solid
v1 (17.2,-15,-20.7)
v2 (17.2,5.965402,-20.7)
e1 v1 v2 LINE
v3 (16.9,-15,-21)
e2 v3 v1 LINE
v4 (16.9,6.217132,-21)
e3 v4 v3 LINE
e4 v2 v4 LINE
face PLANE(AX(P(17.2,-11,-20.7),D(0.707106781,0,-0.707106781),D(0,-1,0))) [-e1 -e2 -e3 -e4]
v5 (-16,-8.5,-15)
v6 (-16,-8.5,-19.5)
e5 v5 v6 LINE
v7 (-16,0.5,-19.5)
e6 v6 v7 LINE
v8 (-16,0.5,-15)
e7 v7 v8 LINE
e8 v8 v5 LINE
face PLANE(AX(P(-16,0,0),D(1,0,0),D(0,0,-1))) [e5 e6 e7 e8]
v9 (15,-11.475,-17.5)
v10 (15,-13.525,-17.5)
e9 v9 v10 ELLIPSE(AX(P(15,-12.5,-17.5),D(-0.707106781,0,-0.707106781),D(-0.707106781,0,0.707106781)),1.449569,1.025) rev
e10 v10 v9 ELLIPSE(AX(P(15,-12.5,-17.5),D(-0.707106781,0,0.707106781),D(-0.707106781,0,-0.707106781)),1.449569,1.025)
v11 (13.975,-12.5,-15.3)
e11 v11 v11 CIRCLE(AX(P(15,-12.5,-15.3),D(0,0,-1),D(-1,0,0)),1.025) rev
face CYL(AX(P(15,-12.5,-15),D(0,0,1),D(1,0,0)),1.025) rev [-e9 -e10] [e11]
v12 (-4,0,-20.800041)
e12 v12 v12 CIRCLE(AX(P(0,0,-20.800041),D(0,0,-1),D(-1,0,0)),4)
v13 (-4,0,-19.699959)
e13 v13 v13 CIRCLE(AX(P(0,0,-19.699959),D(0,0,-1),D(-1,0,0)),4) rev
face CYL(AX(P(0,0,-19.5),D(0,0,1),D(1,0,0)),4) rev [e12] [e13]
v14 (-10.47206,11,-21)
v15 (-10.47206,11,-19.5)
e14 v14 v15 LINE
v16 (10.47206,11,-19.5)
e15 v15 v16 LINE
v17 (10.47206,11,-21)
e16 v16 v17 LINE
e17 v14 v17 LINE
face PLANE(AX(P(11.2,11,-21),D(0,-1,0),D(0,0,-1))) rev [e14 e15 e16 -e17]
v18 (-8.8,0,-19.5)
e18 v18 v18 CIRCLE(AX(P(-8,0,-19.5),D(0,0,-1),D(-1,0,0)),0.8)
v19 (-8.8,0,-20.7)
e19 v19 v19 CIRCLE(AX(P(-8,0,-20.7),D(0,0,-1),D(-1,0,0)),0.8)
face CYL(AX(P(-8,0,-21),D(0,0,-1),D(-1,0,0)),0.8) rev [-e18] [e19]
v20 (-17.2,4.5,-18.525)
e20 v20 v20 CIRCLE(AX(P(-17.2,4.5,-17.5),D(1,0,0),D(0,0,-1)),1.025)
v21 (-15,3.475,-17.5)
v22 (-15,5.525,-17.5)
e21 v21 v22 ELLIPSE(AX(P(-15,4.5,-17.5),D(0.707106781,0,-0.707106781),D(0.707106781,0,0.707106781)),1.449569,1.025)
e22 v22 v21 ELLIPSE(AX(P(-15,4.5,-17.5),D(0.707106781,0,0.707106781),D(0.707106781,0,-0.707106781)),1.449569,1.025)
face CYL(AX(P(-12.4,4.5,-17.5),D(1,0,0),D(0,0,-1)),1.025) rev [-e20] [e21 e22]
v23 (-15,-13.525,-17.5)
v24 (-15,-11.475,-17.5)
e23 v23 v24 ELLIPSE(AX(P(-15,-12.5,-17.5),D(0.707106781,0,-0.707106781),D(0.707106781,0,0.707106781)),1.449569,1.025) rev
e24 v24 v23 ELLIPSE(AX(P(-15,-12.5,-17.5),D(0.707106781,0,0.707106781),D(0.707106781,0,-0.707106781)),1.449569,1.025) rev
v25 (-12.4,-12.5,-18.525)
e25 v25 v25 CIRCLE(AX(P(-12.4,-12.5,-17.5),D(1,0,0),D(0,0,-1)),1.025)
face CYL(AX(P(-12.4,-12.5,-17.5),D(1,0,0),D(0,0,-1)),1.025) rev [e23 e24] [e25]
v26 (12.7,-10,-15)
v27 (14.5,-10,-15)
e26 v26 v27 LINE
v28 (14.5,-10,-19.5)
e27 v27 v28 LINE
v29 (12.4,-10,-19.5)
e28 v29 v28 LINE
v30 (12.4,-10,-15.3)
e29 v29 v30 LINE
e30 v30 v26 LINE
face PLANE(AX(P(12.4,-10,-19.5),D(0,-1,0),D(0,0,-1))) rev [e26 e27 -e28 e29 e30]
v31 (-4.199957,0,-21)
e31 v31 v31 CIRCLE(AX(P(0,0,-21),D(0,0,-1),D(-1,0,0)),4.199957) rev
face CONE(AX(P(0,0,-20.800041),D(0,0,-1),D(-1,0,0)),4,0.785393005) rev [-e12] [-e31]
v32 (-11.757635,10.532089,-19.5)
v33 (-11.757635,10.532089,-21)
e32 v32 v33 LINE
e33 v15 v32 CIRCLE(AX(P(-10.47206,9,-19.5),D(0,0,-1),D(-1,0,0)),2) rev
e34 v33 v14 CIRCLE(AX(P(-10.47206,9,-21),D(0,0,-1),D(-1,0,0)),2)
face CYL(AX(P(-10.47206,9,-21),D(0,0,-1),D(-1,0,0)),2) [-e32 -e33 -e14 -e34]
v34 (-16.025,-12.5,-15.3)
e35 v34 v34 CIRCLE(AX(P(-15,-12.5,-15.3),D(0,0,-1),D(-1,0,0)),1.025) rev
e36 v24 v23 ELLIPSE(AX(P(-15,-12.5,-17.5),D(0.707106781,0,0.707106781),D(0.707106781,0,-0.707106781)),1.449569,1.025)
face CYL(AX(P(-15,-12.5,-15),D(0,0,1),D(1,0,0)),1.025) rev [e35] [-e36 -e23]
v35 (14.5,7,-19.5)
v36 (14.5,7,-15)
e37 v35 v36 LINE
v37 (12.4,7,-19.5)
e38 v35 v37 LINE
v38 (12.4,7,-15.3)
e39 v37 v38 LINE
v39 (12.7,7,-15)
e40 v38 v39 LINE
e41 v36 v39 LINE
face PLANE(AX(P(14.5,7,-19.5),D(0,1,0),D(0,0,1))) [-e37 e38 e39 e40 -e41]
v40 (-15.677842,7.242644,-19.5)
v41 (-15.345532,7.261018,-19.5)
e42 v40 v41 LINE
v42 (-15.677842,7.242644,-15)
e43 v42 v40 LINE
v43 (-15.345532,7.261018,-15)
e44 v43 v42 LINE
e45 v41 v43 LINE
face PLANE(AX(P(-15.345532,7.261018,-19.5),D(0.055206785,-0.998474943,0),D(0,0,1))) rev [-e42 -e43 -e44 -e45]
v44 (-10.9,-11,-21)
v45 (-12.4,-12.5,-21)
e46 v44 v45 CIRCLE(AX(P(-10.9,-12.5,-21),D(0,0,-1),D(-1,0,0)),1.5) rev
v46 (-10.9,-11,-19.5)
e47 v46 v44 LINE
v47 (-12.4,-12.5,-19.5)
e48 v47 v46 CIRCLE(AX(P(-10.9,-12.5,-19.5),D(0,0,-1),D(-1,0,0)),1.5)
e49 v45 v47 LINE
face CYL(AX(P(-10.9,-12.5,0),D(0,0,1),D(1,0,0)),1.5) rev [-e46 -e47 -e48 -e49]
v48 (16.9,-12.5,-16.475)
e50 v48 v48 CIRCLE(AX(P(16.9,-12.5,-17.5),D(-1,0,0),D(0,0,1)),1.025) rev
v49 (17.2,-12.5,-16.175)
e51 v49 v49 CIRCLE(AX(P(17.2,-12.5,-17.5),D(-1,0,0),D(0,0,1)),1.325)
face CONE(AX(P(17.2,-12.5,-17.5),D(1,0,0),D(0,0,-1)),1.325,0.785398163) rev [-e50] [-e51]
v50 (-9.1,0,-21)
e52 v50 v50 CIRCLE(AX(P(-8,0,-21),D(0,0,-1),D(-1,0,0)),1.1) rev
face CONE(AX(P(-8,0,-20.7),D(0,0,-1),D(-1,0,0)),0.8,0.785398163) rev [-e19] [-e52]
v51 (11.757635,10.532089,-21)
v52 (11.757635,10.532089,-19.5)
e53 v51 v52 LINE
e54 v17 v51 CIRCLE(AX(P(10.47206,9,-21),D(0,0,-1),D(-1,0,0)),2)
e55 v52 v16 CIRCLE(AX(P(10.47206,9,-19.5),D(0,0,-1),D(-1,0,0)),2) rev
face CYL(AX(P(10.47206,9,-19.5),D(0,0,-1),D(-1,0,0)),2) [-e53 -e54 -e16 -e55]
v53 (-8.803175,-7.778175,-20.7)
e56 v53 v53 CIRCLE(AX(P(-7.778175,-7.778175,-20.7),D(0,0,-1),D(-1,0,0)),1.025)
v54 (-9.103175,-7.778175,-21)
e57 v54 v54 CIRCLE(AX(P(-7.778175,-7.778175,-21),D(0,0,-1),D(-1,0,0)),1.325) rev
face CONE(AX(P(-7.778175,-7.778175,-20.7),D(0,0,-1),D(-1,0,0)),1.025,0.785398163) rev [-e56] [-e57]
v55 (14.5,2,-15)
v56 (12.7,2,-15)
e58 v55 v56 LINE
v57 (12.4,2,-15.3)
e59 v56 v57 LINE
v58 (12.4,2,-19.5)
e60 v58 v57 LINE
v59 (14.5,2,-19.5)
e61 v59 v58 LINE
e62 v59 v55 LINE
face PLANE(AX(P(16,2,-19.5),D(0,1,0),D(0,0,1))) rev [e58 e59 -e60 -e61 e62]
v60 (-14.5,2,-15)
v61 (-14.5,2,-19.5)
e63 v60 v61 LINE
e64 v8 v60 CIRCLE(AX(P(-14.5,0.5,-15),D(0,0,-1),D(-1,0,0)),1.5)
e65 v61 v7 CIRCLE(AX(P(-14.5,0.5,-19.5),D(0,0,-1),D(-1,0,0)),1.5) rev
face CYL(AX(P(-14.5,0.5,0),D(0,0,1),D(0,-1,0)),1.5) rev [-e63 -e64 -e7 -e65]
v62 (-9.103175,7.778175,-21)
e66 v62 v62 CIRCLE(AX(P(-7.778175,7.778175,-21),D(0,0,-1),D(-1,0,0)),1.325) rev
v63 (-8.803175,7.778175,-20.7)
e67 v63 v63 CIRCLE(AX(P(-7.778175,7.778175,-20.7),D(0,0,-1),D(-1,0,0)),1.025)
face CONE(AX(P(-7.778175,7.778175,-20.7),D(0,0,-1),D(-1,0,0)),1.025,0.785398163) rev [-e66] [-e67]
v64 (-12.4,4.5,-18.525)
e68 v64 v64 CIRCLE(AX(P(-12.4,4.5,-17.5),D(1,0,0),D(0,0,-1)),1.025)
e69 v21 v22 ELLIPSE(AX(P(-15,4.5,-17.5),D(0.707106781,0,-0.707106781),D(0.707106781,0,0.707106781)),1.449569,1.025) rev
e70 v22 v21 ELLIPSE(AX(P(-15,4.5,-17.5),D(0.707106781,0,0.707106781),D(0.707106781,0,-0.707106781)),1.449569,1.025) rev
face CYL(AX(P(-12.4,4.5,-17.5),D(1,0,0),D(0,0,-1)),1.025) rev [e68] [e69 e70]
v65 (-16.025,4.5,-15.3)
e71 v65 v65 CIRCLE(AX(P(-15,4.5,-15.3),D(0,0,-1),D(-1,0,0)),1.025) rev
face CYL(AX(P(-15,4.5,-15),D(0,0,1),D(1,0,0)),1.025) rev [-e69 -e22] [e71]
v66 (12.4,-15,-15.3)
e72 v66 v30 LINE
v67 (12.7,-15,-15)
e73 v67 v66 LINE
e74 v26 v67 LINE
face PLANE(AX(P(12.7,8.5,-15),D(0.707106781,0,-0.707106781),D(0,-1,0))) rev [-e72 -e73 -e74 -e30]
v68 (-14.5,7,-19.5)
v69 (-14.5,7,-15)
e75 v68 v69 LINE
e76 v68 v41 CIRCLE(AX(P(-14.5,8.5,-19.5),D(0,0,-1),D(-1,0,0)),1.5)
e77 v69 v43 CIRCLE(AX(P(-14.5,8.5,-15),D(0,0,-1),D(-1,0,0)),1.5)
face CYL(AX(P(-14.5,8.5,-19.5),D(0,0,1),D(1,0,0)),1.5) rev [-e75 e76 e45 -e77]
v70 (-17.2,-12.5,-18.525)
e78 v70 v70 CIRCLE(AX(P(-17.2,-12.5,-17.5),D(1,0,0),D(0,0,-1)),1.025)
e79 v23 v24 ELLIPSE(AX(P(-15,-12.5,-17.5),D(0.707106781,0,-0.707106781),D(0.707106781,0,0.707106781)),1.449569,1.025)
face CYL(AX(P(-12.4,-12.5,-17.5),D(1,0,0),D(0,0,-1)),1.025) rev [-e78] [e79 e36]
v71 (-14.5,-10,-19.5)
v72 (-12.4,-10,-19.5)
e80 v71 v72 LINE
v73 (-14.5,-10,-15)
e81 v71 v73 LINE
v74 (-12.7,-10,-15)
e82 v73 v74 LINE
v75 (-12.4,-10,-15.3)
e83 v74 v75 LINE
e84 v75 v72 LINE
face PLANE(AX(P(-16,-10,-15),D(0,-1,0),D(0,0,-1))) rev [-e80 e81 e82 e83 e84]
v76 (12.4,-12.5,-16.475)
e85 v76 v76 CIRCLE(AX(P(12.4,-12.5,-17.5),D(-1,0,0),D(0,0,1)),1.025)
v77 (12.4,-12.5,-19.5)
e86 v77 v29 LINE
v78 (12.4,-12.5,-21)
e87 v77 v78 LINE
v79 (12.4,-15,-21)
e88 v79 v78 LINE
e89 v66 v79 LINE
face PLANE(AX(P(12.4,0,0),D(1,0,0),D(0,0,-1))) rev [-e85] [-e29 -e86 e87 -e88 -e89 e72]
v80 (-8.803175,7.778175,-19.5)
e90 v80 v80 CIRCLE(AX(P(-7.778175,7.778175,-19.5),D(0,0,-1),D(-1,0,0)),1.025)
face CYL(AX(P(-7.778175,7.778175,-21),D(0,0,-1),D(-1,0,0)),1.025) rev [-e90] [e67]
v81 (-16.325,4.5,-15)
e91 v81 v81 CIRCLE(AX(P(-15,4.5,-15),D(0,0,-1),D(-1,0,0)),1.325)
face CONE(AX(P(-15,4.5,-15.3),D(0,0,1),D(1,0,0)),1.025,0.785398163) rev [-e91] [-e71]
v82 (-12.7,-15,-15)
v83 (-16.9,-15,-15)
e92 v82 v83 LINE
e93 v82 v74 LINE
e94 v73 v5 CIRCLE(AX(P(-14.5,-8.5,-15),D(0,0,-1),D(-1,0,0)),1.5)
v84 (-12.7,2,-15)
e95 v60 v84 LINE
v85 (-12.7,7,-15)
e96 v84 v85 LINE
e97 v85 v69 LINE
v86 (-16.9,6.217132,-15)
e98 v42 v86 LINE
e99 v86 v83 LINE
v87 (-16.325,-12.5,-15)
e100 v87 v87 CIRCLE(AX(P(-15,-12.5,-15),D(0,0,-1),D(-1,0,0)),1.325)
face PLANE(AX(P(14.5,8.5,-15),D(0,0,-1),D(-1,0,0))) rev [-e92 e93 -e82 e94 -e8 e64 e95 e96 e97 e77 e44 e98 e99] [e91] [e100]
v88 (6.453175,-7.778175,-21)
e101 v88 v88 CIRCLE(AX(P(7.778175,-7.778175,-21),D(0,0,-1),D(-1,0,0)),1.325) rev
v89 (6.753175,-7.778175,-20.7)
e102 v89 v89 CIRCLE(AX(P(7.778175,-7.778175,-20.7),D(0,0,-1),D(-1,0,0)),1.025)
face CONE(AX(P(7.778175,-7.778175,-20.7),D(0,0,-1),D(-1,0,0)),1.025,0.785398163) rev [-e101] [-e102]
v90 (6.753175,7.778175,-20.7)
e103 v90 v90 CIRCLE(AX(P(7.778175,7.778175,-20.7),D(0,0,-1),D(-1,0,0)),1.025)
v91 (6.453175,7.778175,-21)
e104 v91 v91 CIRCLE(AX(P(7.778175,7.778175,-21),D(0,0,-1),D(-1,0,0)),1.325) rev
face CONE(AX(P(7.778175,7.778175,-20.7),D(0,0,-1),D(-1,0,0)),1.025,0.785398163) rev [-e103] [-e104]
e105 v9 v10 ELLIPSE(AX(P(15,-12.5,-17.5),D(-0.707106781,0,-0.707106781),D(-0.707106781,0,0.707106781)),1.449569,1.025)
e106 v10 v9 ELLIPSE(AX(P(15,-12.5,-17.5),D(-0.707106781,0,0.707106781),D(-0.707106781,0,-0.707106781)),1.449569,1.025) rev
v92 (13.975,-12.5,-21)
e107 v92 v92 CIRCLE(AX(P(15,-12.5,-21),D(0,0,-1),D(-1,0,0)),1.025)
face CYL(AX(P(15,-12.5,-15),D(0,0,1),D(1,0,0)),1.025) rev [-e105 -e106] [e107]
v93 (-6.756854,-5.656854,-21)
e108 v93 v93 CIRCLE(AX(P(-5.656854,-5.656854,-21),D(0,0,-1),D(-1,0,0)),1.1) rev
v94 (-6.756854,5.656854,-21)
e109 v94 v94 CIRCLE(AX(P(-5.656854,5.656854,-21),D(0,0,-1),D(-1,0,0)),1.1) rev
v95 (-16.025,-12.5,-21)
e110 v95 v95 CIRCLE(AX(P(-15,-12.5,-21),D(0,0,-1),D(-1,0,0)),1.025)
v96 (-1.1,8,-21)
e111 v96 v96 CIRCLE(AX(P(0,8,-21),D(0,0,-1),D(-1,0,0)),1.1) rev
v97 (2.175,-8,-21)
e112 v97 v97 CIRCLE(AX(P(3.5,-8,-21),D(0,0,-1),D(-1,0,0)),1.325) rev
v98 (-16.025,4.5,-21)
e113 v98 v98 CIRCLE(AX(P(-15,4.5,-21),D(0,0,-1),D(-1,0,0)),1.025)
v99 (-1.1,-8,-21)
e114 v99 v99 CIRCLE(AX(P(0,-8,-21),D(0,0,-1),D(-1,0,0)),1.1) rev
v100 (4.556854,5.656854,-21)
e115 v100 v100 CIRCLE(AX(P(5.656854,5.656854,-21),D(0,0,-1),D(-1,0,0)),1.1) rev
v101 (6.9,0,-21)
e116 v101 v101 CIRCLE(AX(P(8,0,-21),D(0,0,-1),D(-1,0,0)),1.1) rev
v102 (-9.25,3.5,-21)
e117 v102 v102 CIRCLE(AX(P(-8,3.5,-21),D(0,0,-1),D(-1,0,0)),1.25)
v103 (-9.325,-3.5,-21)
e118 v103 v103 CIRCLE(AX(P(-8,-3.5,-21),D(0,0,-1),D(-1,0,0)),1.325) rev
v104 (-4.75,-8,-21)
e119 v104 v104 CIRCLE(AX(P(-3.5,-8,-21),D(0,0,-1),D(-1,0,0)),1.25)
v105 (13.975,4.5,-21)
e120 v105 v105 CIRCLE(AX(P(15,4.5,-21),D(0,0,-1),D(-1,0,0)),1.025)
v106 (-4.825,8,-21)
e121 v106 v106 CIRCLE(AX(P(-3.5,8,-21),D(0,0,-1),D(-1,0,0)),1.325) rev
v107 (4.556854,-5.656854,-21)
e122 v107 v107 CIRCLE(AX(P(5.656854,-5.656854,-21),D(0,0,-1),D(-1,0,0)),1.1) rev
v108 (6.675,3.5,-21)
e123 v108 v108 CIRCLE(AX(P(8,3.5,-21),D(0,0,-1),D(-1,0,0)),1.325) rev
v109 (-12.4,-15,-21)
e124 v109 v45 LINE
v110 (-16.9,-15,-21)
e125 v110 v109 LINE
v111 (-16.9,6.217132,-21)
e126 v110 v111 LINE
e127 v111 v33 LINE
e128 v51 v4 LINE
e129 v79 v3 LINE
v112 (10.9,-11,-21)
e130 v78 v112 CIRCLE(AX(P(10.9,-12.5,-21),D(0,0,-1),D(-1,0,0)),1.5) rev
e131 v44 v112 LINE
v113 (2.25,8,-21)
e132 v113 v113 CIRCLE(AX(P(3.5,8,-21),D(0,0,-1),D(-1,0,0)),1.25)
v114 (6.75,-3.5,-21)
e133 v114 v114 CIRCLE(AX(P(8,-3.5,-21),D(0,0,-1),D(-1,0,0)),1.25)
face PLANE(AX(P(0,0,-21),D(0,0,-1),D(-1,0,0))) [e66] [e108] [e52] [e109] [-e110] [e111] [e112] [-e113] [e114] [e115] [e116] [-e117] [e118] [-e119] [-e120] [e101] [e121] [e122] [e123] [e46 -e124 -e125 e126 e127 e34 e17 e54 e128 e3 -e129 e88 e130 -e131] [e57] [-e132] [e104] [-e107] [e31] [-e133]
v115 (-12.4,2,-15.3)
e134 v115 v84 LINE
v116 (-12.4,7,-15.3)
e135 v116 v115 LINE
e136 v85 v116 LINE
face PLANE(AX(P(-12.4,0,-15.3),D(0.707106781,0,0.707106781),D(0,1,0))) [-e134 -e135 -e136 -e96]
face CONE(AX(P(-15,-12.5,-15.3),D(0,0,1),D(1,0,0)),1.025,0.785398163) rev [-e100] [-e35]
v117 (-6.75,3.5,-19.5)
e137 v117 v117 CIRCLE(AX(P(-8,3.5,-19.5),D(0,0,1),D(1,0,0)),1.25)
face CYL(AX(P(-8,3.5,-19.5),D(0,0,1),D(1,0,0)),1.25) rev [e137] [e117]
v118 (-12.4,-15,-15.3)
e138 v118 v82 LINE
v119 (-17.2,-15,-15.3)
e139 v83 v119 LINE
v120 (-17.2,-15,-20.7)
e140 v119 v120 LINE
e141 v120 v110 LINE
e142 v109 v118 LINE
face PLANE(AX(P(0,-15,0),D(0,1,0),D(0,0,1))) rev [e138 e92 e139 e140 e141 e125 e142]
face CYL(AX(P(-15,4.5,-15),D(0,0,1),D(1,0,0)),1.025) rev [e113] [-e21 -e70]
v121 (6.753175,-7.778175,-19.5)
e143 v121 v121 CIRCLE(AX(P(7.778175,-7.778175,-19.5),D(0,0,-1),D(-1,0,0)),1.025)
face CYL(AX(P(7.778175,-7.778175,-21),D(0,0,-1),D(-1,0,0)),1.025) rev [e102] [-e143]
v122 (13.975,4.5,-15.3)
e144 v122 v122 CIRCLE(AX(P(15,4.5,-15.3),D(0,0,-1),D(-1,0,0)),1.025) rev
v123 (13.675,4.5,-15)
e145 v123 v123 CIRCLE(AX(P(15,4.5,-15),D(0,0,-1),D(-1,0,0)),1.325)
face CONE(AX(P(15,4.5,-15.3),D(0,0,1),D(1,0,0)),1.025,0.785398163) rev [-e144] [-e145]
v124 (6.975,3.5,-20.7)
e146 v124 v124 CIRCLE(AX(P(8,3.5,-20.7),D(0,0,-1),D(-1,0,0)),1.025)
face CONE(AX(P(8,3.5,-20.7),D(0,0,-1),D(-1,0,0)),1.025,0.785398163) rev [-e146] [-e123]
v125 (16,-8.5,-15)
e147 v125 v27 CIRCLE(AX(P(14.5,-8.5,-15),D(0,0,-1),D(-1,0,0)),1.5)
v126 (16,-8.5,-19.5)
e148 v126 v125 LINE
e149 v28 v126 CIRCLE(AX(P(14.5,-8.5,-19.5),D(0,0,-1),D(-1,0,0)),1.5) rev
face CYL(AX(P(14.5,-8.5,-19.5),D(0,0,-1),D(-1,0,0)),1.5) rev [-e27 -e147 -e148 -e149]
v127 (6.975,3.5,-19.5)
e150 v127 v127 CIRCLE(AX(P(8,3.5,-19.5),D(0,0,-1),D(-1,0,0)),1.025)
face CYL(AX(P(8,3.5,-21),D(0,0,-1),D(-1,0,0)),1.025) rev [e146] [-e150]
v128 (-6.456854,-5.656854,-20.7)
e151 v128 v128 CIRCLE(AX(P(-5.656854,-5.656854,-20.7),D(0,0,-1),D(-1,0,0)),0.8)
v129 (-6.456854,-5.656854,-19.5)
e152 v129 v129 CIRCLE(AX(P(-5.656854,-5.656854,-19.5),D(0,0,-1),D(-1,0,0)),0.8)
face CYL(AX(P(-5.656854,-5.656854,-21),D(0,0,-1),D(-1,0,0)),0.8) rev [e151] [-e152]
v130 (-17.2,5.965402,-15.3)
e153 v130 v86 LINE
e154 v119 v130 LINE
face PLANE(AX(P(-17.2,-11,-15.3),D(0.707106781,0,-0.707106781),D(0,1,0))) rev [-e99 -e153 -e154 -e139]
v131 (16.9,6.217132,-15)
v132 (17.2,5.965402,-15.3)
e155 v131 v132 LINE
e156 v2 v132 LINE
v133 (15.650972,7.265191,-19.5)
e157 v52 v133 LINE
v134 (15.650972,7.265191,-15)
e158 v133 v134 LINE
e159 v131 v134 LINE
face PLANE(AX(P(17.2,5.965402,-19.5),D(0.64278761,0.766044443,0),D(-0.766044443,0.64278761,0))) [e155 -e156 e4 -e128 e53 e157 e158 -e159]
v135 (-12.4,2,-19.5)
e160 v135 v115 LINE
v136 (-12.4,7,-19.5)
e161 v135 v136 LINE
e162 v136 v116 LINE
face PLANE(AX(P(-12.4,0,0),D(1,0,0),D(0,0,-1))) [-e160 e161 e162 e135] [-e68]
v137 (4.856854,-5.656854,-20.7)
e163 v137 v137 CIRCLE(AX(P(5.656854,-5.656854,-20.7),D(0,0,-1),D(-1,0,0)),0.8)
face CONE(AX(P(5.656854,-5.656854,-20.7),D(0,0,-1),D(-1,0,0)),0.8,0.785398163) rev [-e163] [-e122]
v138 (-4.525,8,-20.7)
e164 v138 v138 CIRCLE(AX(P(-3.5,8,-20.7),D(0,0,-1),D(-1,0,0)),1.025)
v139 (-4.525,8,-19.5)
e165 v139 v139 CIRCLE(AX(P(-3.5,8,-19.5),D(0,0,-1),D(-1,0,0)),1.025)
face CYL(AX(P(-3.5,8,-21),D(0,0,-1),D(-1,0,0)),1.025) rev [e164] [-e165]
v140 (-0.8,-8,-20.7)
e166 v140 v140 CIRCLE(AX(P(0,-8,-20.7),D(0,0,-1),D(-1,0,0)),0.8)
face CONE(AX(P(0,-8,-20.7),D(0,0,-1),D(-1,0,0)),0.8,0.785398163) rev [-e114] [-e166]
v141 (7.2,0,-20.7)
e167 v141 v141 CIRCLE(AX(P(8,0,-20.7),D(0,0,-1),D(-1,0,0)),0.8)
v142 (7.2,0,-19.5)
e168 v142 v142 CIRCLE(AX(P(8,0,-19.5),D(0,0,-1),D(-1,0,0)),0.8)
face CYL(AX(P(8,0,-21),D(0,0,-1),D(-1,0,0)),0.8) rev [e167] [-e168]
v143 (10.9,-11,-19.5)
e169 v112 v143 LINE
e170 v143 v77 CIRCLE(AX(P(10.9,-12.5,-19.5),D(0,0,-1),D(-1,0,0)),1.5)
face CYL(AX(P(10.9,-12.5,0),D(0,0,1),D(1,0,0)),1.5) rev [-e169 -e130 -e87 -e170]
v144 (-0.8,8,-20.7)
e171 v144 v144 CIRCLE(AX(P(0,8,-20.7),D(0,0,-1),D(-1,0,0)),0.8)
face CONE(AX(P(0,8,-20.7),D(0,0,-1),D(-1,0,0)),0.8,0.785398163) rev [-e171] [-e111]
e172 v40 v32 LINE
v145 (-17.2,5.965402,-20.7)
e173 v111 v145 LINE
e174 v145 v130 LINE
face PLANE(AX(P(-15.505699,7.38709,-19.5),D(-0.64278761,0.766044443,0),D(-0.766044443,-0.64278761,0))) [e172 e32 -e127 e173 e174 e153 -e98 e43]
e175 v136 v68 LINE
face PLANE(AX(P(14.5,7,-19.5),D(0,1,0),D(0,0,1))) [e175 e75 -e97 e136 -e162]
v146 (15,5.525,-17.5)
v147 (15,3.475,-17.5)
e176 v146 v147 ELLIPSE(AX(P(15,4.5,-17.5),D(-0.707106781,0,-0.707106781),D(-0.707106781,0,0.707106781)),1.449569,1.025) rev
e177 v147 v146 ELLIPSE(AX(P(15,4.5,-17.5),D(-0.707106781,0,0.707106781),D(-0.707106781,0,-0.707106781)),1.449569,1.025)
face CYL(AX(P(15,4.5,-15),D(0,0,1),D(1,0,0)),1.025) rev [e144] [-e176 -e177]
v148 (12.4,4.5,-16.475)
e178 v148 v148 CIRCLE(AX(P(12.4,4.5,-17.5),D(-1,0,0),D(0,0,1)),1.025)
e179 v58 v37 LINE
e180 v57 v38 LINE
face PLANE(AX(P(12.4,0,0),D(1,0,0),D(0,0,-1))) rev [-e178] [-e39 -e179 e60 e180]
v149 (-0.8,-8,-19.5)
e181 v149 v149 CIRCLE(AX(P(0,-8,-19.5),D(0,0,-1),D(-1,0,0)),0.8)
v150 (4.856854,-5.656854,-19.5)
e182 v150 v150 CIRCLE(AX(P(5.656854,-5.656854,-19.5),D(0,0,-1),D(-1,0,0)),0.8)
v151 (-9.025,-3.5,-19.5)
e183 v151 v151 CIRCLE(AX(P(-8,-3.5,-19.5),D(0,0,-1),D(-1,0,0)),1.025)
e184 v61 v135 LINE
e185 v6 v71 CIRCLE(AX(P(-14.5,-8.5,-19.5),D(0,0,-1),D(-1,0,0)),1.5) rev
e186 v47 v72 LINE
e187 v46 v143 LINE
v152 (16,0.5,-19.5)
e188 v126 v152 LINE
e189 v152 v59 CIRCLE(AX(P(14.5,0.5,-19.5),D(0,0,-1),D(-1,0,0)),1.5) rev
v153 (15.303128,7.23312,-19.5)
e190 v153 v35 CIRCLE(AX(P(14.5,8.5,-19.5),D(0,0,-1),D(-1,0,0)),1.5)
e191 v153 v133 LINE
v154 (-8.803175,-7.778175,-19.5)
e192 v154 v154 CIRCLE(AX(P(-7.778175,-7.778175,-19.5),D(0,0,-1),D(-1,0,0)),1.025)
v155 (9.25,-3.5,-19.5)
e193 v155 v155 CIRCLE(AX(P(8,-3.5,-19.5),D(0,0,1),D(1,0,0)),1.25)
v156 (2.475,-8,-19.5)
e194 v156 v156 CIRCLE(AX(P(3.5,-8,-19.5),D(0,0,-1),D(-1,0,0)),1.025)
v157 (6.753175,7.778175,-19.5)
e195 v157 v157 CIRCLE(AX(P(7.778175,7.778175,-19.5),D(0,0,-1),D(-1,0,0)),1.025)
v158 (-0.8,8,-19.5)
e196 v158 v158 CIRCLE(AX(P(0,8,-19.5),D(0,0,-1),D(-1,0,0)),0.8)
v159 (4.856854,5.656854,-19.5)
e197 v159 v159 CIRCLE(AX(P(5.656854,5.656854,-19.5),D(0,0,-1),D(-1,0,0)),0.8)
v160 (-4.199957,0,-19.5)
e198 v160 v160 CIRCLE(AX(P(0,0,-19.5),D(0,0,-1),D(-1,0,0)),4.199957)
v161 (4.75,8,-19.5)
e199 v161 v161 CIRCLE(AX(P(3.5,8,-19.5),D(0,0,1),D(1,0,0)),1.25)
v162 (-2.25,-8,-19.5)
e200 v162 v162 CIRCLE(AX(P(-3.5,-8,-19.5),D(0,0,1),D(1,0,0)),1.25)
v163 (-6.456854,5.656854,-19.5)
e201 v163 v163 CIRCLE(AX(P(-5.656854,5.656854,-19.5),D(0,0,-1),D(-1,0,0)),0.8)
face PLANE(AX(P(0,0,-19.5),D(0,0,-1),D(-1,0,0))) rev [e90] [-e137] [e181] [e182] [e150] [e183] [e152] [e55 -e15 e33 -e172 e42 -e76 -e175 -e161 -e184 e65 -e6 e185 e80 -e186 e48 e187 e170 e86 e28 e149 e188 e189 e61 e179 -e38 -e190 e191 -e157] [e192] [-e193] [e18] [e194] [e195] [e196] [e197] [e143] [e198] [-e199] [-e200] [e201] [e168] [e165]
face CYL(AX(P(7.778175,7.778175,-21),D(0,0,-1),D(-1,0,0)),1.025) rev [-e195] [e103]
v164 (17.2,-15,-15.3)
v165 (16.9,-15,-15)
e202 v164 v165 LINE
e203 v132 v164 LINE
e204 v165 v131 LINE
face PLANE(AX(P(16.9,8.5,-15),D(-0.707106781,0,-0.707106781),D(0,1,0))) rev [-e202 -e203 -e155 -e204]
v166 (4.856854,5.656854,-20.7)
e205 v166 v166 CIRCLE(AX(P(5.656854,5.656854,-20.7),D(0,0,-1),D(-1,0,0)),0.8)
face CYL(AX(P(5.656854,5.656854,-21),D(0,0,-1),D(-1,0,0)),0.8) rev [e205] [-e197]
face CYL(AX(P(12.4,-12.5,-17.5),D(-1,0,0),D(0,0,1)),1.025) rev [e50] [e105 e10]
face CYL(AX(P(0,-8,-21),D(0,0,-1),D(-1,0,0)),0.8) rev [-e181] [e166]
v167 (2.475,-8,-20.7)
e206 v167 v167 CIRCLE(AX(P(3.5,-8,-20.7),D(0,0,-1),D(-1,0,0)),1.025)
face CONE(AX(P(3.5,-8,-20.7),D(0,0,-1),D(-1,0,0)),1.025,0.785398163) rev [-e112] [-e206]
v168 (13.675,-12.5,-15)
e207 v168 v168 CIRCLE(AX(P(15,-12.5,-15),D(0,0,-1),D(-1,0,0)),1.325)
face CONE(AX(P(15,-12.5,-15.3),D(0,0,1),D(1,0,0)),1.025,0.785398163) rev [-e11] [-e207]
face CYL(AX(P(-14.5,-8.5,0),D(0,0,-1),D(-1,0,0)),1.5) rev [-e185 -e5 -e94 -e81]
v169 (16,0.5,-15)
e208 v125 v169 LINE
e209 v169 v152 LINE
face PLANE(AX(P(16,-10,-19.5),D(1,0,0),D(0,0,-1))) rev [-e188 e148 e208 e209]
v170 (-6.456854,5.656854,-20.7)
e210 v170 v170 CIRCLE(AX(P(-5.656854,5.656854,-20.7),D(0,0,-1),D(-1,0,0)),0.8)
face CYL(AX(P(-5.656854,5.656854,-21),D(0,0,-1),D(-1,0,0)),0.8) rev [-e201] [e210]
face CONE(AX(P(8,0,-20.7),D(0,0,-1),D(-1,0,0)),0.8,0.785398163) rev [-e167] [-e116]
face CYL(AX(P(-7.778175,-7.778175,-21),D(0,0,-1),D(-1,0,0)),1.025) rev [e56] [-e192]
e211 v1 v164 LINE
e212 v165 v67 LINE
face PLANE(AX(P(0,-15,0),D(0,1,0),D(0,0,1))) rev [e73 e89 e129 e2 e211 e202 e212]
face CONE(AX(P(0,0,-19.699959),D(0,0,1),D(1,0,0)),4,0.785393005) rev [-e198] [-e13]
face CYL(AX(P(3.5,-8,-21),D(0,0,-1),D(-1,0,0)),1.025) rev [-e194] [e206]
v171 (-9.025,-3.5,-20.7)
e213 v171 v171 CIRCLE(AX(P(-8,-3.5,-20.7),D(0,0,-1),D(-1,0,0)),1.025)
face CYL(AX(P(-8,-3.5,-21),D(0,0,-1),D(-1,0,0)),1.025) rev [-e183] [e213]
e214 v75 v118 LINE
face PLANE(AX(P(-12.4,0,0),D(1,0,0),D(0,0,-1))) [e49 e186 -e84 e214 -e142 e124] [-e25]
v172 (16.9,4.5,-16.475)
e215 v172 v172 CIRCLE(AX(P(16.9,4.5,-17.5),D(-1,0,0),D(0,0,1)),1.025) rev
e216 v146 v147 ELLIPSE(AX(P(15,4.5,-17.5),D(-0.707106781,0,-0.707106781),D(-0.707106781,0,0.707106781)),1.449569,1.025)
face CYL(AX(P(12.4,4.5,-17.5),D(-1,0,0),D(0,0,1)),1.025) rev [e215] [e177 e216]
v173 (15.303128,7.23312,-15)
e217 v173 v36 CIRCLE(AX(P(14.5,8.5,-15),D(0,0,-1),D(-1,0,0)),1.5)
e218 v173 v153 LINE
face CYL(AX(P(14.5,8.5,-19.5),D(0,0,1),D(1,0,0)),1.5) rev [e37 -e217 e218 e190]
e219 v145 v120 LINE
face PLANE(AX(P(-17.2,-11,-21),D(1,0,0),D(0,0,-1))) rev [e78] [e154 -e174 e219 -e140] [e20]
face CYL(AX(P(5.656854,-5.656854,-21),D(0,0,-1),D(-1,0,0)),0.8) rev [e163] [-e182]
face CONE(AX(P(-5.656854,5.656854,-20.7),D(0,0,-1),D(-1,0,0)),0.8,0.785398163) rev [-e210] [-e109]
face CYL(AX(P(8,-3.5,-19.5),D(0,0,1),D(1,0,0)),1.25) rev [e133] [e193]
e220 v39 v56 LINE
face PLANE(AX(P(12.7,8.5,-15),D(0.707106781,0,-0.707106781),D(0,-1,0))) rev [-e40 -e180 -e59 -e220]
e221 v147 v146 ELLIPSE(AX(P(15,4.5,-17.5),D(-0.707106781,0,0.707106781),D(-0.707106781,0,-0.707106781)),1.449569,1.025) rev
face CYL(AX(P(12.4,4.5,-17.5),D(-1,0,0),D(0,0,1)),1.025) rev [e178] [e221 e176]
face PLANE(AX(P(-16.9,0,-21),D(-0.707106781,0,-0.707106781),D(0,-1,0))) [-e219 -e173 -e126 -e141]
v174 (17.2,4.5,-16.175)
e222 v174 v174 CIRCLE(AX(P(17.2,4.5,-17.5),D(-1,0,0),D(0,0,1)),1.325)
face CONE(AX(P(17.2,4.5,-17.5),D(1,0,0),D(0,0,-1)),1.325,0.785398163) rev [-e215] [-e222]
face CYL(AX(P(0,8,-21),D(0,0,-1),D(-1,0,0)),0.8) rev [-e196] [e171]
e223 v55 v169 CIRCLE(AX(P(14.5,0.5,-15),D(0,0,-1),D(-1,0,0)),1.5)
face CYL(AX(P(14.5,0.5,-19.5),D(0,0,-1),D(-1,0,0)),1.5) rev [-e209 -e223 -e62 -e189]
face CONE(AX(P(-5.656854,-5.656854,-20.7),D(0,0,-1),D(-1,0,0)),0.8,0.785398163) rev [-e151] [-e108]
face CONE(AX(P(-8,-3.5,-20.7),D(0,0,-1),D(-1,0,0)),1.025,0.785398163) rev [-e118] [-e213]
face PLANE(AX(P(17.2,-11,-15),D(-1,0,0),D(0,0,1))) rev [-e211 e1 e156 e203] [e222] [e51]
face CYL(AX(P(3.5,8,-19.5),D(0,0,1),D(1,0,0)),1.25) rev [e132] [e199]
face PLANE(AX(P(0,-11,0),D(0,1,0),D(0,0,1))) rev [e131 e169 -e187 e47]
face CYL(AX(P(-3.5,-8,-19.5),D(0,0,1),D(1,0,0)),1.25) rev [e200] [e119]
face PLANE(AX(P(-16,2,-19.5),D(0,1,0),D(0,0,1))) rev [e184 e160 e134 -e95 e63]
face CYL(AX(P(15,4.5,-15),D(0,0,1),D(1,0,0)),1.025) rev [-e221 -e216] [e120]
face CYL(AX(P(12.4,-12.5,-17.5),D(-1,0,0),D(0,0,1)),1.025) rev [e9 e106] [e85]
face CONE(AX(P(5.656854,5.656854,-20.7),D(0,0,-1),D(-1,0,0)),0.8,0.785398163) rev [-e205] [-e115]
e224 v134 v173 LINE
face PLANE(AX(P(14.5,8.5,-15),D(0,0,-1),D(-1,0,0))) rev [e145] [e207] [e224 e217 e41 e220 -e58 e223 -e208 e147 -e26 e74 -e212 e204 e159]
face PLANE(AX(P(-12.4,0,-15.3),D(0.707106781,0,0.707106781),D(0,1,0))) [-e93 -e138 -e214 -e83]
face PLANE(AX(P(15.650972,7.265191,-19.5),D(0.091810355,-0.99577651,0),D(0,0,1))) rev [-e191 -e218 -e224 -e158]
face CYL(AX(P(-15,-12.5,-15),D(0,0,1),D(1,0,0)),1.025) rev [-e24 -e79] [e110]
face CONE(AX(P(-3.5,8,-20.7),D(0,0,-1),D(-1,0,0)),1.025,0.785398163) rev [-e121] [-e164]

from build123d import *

# Parameters (mm, degrees)
BOSS_EXTRUDE1_DEPTH              = 4.5
BOSS_EXTRUDE2_DEPTH              = 1.5
SKETCH3_W                        = 34.4
SKETCH3_H                        = 6
BOSS_EXTRUDE3_DEPTH              = 16.965402213
SKETCH4_W                        = 4.5
SKETCH4_H                        = 18
CUT_EXTRUDE1_DEPTH               = 24.8
SKETCH5_W                        = 4.8
SKETCH5_H                        = 6
BOSS_EXTRUDE4_DEPTH              = 4
SKETCH6_W                        = 4.8
SKETCH6_H                        = 6
BOSS_EXTRUDE5_DEPTH              = 4
SKETCH7_W                        = 4.5
SKETCH7_H                        = 12
CUT_EXTRUDE2_DEPTH               = 3.6
SKETCH8_W                        = 3.6
SKETCH8_H                        = 12
CUT_EXTRUDE3_DEPTH               = 4.5
F_2_05_2_05_DIAMETER_HOLE1_D     = 2.05
F_2_05_2_05_DIAMETER_HOLE1_DEPTH = 4.8
F_2_05_2_05_DIAMETER_HOLE2_D     = 2.05
F_2_5_2_5_DIAMETER_HOLE1_D       = 2.5
F_2_05_2_05_DIAMETER_HOLE3_D     = 2.05
F_2_05_2_05_DIAMETER_HOLE3_DEPTH = 6.000025
F_1_6_1_6_DIAMETER_HOLE1_D       = 1.6
F_1_6_1_6_DIAMETER_HOLE1_DEPTH   = 6.000025
F_8_0_8_DIAMETER_HOLE1_D         = 8
F_2_05_2_05_DIAMETER_HOLE4_D     = 2.05
F_2_05_2_05_DIAMETER_HOLE4_DEPTH = 9.5
CHAMFER1_SIZE                    = 0.3
CHAMFER2_SIZE2                   = 0.199958733
CHAMFER2_SIZE                    = 0.19995667
CHAMFER3_SIZE                    = 0.18964074
CHAMFER3_SIZE_2                  = 0.224716875
FILLET1_R                        = 1.5
FILLET2_R                        = 2


with BuildPart() as part:
    # Sketch1 → Boss-Extrude1 (new body)
    with BuildSketch(Plane.XY.offset(-15)):
        with BuildLine():
            Line((-17.2, 5.965402213), (17.2, 5.965402213))
            Line((17.2, 5.965402213), (15.505698966, 7.387089586))
            ThreePointArc((15.505698966, 7.387089586), (15.038810903, 7.100113286), (14.5, 7))
            Line((14.5, 7), (-14.5, 7))
            ThreePointArc((-14.5, 7), (-15.038810903, 7.100113286), (-15.505698966, 7.387089586))
            Line((-15.505698966, 7.387089586), (-17.2, 5.965402213))
        make_face()
    extrude(amount=-BOSS_EXTRUDE1_DEPTH)

    # Sketch2 → Boss-Extrude2 (add)
    with BuildSketch(Plane(origin=(0, 0, -19.5), x_dir=(-1, 0, 0), z_dir=(0, 0, -1))):
        Polygon((17.2, 5.965402213), (-17.2, 5.965402213), (-11.2, 11), (11.2, 11), align=None)
    extrude(amount=BOSS_EXTRUDE2_DEPTH)

    # Sketch3 → Boss-Extrude3 (add)
    with BuildSketch(Plane.XZ.offset(-5.965402213)):
        with Locations((0, -18)):
            Rectangle(SKETCH3_W, SKETCH3_H)
    extrude(amount=BOSS_EXTRUDE3_DEPTH)

    # Sketch4 → Cut-Extrude1 (cut)
    with BuildSketch(Plane(origin=(12.4, 0, 0), x_dir=(0, 0, -1), z_dir=(1, 0, 0))):
        with Locations((17.25, -2)):
            Rectangle(SKETCH4_W, SKETCH4_H)
    extrude(amount=-CUT_EXTRUDE1_DEPTH, mode=Mode.SUBTRACT)

    # Sketch5 → Boss-Extrude4 (add)
    with BuildSketch(Plane.XZ.offset(11)):
        with Locations((14.8, -18)):
            Rectangle(SKETCH5_W, SKETCH5_H)
    extrude(amount=BOSS_EXTRUDE4_DEPTH)

    # Sketch6 → Boss-Extrude5 (add)
    with BuildSketch(Plane.XZ.offset(11)):
        with Locations((-14.8, -18)):
            Rectangle(SKETCH6_W, SKETCH6_H)
    extrude(amount=BOSS_EXTRUDE5_DEPTH)

    # Sketch7 → Cut-Extrude2 (cut)
    with BuildSketch(Plane(origin=(-12.4, 0, 0), x_dir=(0, 0, -1), z_dir=(1, 0, 0))):
        with Locations((17.25, -4)):
            Rectangle(SKETCH7_W, SKETCH7_H)
    extrude(amount=-CUT_EXTRUDE2_DEPTH, mode=Mode.SUBTRACT)

    # Sketch8 → Cut-Extrude3 (cut)
    with BuildSketch(Plane.XY.offset(-15)):
        with Locations((14.2, -4)):
            Rectangle(SKETCH8_W, SKETCH8_H)
    extrude(amount=-CUT_EXTRUDE3_DEPTH, mode=Mode.SUBTRACT)

    # Ø2.05 (2.05) Diameter Hole1
    with Locations(Plane(origin=(-12.4, 0, 0), x_dir=(0, 0, -1), z_dir=(1, 0, 0))):
        with Locations((17.5, 4.5), (17.5, -12.5)):
            Hole(F_2_05_2_05_DIAMETER_HOLE1_D / 2, depth=F_2_05_2_05_DIAMETER_HOLE1_DEPTH)

    # Ø2.05 (2.05) Diameter Hole2 (through all)
    with Locations(Plane.ZY.offset(-12.4)):
        with Locations((-17.5, 4.5), (-17.5, -12.5)):
            Hole(F_2_05_2_05_DIAMETER_HOLE2_D / 2)

    # Ø2.5 (2.5) Diameter Hole1 (through all)
    with Locations(Plane.XY.offset(-19.5)):
        with Locations((3.5, 8), (-8, 3.5), (-3.5, -8), (8, -3.5)):
            Hole(F_2_5_2_5_DIAMETER_HOLE1_D / 2)

    # Ø2.05 (2.05) Diameter Hole3
    with Locations(Plane(origin=(0, 0, -21), x_dir=(-1, 0, 0), z_dir=(0, 0, -1))):
        with Locations((3.5, 8), (8, -3.5), (-3.5, -8), (-8, 3.5), (7.778174593, 7.778174593), (7.778174593, -7.778174593), (-7.778174593, -7.778174593), (-7.778174593, 7.778174593)):
            Hole(F_2_05_2_05_DIAMETER_HOLE3_D / 2, depth=F_2_05_2_05_DIAMETER_HOLE3_DEPTH)

    # Ø1.6 (1.6) Diameter Hole1
    with Locations(Plane(origin=(0, 0, -21), x_dir=(-1, 0, 0), z_dir=(0, 0, -1))):
        with Locations((0, 8), (-5.656854249, 5.656854249), (-8, 0), (-5.656854249, -5.656854249), (0, -8), (5.656854249, -5.656854249), (8, 0), (5.656854249, 5.656854249)):
            Hole(F_1_6_1_6_DIAMETER_HOLE1_D / 2, depth=F_1_6_1_6_DIAMETER_HOLE1_DEPTH)

    # Ø8.0 (8) Diameter Hole1 (through all)
    with Locations(Plane.XY.offset(-19.5)):
        with Locations((0, 0)):
            Hole(F_8_0_8_DIAMETER_HOLE1_D / 2)

    # Ø2.05 (2.05) Diameter Hole4
    with Locations(Plane.XY.offset(-15)):
        with Locations((15, 4.5), (-15, 4.5), (15, -12.5), (-15, -12.5)):
            Hole(F_2_05_2_05_DIAMETER_HOLE4_D / 2, depth=F_2_05_2_05_DIAMETER_HOLE4_DEPTH)

    # Chamfer1
    chamfer1_edges = [part.edges().sort_by_distance(p)[0] for p in [
        (12.4, -12.5, -15),
        (17.2, -12.5, -16.475),
        (17.2, 4.5, -16.475),
        (6.753174593, 7.778174593, -21),
        (6.753174593, -7.778174593, -21),
        (-8.803174593, -7.778174593, -21),
        (-8.803174593, 7.778174593, -21),
        (6.975, 3.5, -21),
        (2.475, -8, -21),
        (-9.025, -3.5, -21),
        (-4.525, 8, -21),
        (-6.456854249, 5.656854249, -21),
        (-8.8, 0, -21),
        (-6.456854249, -5.656854249, -21),
        (-0.8, -8, -21),
        (4.856854249, -5.656854249, -21),
        (7.2, 0, -21),
        (4.856854249, 5.656854249, -21),
        (-0.8, 8, -21),
        (-13.975, -12.5, -15),
        (16.025, -12.5, -15),
        (-13.975, 4.5, -15),
        (16.025, 4.5, -15),
        (17.2, -4.517298894, -15),
        (-17.2, -4.517298894, -15),
        (-17.2, -4.517298894, -21),
        (17.2, -4.517298894, -21),
        (-12.4, 4.5, -15),
        (12.4, 4.5, -15),
        (-12.4, -12.5, -15),
    ]]
    chamfer(chamfer1_edges, length=CHAMFER1_SIZE)

    # Chamfer2
    chamfer2_edges = [part.edges().sort_by_distance(p)[0] for p in [
        (4, 0, -21),
        (4, 0, -19.5),
    ]]
    chamfer(chamfer2_edges, length=CHAMFER2_SIZE, length2=CHAMFER2_SIZE2)

    # Chamfer3
    # the kernel refuses this chamfer: 0.224716875, 0.18964074 mm, written as the material it takes off along each edge
    with BuildSketch(Plane(origin=(15.505698966, 7.387089586, -14.344718434), x_dir=(0.7660444431190041, -0.6427876096865084, 0), z_dir=(0, 0, -1))) as chamfer3_piece_1:
        with BuildLine():
            Line((CHAMFER3_SIZE * 1.00000000217, 0), (-0.056208561, 0.248157995))
            ThreePointArc((-0.056208561, 0.248157995), (-0.023684334, 0.129009753), (0, 0))
            Line((0, 0), (CHAMFER3_SIZE * 1.00000000217, 0))
        make_face()
    extrude(amount=5.155281566, mode=Mode.SUBTRACT)
    with BuildSketch(Plane(origin=(-15.505698966, 7.387089586, -14.420065816), x_dir=(-0.7660444431188352, -0.6427876096867096, 0), z_dir=(0, 0, -1))) as chamfer3_piece_2:
        with BuildLine():
            Line((CHAMFER3_SIZE_2 * 0.999999998201, 0), (-0.041658025, -0.199529783))
            ThreePointArc((-0.041658025, -0.199529783), (-0.018131885, -0.103788276), (0, 0))
            Line((0, 0), (CHAMFER3_SIZE_2 * 0.999999998201, 0))
        make_face()
    extrude(amount=5.079934184, mode=Mode.SUBTRACT)

    # Fillet1
    fillet1_edges = [part.edges().sort_by_distance(p)[0] for p in [
        (16, 2, -17.25),
        (-16, -10, -17.25),
        (-16, 2, -17.25),
        (12.4, -11, -20.25),
        (16, -10, -17.25),
        (-12.4, -11, -20.25),
    ]]
    fillet(fillet1_edges, radius=FILLET1_R)

    # Fillet2
    fillet2_edges = [part.edges().sort_by_distance(p)[0] for p in [
        (11.2, 11, -20.25),
        (-11.2, 11, -20.25),
    ]]
    fillet(fillet2_edges, radius=FILLET2_R)


solid = part.part
